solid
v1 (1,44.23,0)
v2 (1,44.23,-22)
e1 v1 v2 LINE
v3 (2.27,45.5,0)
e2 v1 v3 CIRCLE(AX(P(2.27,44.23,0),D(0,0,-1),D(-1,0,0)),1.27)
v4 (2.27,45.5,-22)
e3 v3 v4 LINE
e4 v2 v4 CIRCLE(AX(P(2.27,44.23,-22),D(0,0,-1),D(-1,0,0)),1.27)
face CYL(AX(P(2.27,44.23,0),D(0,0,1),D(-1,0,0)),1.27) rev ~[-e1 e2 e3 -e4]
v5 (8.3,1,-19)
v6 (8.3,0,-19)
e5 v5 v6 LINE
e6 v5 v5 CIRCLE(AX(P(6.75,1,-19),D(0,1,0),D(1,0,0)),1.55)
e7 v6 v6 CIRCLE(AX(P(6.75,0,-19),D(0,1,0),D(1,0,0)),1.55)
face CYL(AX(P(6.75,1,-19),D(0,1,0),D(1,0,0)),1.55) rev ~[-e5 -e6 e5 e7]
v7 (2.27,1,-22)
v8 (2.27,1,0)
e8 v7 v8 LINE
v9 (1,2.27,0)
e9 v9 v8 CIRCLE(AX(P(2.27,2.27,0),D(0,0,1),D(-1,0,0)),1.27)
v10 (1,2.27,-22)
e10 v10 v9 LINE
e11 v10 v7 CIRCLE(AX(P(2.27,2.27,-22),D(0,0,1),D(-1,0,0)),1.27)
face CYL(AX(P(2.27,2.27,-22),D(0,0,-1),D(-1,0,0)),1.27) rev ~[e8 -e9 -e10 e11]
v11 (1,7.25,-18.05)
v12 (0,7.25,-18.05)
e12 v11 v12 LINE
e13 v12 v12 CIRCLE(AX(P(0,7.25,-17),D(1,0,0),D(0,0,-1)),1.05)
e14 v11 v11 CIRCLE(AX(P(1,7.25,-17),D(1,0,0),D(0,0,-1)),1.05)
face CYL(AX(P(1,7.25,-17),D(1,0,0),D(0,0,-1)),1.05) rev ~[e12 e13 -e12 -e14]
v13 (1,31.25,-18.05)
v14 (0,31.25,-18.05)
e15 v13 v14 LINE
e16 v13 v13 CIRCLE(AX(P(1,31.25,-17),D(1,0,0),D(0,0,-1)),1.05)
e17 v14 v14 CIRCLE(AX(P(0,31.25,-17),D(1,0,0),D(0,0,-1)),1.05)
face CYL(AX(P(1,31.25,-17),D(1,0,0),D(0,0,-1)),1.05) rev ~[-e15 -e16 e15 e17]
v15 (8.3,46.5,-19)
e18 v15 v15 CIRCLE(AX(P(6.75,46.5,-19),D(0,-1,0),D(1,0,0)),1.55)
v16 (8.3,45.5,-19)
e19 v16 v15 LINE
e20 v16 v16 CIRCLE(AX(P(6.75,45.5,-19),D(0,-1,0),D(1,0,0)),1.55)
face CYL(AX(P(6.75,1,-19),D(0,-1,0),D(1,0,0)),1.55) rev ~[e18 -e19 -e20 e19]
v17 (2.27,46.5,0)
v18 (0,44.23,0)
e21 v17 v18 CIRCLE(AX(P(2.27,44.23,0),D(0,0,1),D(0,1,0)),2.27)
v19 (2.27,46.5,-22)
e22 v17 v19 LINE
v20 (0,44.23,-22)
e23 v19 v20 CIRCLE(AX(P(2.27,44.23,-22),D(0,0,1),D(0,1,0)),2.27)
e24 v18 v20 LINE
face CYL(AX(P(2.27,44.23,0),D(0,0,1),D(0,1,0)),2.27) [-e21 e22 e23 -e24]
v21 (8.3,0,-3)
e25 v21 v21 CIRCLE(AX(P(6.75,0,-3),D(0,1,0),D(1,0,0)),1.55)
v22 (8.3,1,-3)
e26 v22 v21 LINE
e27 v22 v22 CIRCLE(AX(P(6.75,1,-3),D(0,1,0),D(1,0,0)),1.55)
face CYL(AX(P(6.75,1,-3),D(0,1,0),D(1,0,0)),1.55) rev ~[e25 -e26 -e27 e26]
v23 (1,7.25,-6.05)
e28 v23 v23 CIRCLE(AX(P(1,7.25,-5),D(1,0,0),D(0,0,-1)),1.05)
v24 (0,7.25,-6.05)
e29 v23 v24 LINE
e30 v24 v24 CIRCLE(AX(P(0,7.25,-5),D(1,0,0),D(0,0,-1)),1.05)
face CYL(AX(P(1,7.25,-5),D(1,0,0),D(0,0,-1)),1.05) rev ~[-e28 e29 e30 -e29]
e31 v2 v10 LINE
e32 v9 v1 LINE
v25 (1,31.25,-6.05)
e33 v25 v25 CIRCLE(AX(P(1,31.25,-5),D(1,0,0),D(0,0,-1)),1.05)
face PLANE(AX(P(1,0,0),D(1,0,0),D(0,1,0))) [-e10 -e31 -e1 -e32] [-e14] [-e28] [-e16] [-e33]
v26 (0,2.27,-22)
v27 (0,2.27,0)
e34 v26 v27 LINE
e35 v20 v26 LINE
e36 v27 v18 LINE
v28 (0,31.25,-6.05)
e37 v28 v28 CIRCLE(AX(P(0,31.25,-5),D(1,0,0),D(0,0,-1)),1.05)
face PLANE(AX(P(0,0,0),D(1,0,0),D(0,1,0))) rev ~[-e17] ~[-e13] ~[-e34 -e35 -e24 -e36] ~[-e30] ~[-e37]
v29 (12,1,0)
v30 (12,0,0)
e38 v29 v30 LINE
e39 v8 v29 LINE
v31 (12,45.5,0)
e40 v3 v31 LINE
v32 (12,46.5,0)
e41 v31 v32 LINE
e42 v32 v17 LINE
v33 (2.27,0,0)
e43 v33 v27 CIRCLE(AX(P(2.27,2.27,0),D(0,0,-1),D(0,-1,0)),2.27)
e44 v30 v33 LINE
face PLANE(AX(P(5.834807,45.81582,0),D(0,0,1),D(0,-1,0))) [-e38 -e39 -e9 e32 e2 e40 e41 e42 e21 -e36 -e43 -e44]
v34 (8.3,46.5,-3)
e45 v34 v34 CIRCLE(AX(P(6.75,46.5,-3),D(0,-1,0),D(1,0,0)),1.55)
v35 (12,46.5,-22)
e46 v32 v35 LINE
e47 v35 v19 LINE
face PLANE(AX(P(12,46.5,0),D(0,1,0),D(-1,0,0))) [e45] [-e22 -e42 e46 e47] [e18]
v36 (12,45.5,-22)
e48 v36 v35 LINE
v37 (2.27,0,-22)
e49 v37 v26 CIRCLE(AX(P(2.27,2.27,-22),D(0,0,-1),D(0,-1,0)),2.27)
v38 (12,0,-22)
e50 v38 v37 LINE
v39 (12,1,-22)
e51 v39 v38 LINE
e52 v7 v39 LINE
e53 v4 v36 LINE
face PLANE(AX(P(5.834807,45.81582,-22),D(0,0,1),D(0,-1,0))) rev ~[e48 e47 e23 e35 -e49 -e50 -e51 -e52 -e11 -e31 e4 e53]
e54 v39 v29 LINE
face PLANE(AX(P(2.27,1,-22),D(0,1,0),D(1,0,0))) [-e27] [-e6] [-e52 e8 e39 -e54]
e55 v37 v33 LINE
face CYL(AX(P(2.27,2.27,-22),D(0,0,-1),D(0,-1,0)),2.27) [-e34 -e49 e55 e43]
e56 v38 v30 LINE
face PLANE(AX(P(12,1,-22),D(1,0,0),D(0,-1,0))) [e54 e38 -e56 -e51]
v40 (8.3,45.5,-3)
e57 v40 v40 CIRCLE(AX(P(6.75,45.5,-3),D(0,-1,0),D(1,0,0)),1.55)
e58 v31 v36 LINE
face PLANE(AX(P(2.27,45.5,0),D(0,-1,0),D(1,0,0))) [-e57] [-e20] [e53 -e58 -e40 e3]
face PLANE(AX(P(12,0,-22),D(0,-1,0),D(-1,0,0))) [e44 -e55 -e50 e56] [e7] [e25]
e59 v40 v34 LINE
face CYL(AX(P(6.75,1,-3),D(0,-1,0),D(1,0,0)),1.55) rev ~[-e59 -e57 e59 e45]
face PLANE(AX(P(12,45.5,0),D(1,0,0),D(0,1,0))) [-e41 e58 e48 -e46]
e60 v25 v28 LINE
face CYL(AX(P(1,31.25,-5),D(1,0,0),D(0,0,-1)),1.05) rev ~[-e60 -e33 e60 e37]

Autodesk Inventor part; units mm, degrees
ref_plane "YZ Plane" through (0, 0, 0) normal (1, 0, 0) x (0, 1, 0)
ref_plane "XZ Plane" through (0, 0, 0) normal (0, 1, 0) x (-1, 0, 0)
ref_plane "XY Plane" through (0, 0, 0) normal (0, 0, 1) x (1, 0, 0)
sketch "Boceto1" plane through (0, 0, 0) normal (1, 0, 0) x (0, 1, 0)
  line L0 (0, 0) -> (46.5, 0)
  line L1 (46.5, 0) -> (46.5, -22)
  line L2 (46.5, -22) -> (0, -22)
  line L3 (0, -22) -> (0, 0)
  dimension "d0" = 46.5
  dimension "d1" = 22
extrude "Placa1" add sketch "Boceto1" along normal blind 1
sketch "Boceto2" plane through (0, 45.5, 0) normal (0, 1, 0) x (-1, 0, 0)
  line L0 (0, -22) -> (0, 0)
  line L1 (0, 0) -> (-12, 0)
  line L2 (-12, 0) -> (-12, -22)
  line L3 (-12, -22) -> (0, -22)
edge flange "Pestaña1" height 12 angle 90 thickness 1 bend radius 1.27 thickness toward (0, 1, 0) relief tear relief width 1 relief depth 0.5 corner gap 1 corner form 0 edges at (1, 46.5, -11) (1, 0, -11) wall of the first edge with corners at (0, 45.5, -22) (0, 45.5, 0) (12, 45.5, 0) (12, 45.5, -22)
bend "Doblez1"
corner "Esquina1"
sketch "Boceto3" plane through (1, 0, 0) normal (1, 0, 0) x (0, 0, -1)
  circle A0 centre (17, 7.25) radius 1.05
  line L0 (0, 0) -> (22, 0) projected
  line L1 (0, 2.27) -> (0, 44.23) projected
  line L2 (0, 0) -> (22, 0) construction
  line L3 (11, 0) -> (11, 46.5) construction
  line L4 (22, 46.5) -> (0, 46.5) construction
  circle A1 centre (5, 7.25) radius 1.05
  line L5 (22, 44.23) -> (22, 2.27) projected
  circle A2 centre (17, 31.25) radius 1.05
  circle A3 centre (5, 31.25) radius 1.05
  dimension "d13" = 2.1
  dimension "d14" = 7.25
  dimension "d16" = 2.1
  dimension "d20" = 24
  dimension "d27" = 12
  dimension "d28" = 6
extrude "Cortar1" cut sketch "Boceto3" against normal blind 1
sketch "Boceto4" plane through (12, 1, 0) normal (0, 1, 0) x (1, 0, 0)
  circle A0 centre (-5.25, 19) radius 1.55
  line L0 (-9.73, 22) -> (0, 22) projected
  line L1 (0, 0) -> (0, 22) construction
  line L2 (0, 11) -> (-13.2221, 11) construction
  circle A1 centre (-5.25, 3) radius 1.55
  point P0 (-12, 0)
  point P1 (-12, 22)
  dimension "d29" = 3.1
  dimension "d32" = 3
  dimension "d33" = 6.75
extrude "Extrusión1" cut sketch "Boceto4" along normal through all both and the other way through all
equation "\"d25\" = Grosor"
equation "\"d2\" = Grosor"
equation "\"d3\" = Anchura_desahogo_plegado"
equation "\"d4\" = Profundidad_desahogo_plegado"
equation "\"d5\" = Remanente_mínimo"
equation "\"d6\" = Radiodetransición"
equation "\"d10\" = Tamaño_destalonado"
equation "\"d11\" = TamañoSeparación"
equation "\"d12\" = Tamaño_de_radio_de_Jacobi"
equation "\"Radio_pliegue\" = Grosor"
equation "\"Anchura_desahogo_plegado\" = Grosor"
equation "\"Profundidad_desahogo_plegado\" = 0.5 * Grosor"
equation "\"Tamaño_destalonado\" = 4 * Grosor"
equation "\"Remanente_mínimo\" = 2 * Grosor"
equation "\"Radiodetransición\" = Radio_pliegue"
equation "\"Tamaño_de_radio_de_Jacobi\" = Radio_pliegue"
equation "\"TamañoSeparación\" = Grosor"
equation "\"Grosor\" = 1"
properties part number "MotorSoport"
